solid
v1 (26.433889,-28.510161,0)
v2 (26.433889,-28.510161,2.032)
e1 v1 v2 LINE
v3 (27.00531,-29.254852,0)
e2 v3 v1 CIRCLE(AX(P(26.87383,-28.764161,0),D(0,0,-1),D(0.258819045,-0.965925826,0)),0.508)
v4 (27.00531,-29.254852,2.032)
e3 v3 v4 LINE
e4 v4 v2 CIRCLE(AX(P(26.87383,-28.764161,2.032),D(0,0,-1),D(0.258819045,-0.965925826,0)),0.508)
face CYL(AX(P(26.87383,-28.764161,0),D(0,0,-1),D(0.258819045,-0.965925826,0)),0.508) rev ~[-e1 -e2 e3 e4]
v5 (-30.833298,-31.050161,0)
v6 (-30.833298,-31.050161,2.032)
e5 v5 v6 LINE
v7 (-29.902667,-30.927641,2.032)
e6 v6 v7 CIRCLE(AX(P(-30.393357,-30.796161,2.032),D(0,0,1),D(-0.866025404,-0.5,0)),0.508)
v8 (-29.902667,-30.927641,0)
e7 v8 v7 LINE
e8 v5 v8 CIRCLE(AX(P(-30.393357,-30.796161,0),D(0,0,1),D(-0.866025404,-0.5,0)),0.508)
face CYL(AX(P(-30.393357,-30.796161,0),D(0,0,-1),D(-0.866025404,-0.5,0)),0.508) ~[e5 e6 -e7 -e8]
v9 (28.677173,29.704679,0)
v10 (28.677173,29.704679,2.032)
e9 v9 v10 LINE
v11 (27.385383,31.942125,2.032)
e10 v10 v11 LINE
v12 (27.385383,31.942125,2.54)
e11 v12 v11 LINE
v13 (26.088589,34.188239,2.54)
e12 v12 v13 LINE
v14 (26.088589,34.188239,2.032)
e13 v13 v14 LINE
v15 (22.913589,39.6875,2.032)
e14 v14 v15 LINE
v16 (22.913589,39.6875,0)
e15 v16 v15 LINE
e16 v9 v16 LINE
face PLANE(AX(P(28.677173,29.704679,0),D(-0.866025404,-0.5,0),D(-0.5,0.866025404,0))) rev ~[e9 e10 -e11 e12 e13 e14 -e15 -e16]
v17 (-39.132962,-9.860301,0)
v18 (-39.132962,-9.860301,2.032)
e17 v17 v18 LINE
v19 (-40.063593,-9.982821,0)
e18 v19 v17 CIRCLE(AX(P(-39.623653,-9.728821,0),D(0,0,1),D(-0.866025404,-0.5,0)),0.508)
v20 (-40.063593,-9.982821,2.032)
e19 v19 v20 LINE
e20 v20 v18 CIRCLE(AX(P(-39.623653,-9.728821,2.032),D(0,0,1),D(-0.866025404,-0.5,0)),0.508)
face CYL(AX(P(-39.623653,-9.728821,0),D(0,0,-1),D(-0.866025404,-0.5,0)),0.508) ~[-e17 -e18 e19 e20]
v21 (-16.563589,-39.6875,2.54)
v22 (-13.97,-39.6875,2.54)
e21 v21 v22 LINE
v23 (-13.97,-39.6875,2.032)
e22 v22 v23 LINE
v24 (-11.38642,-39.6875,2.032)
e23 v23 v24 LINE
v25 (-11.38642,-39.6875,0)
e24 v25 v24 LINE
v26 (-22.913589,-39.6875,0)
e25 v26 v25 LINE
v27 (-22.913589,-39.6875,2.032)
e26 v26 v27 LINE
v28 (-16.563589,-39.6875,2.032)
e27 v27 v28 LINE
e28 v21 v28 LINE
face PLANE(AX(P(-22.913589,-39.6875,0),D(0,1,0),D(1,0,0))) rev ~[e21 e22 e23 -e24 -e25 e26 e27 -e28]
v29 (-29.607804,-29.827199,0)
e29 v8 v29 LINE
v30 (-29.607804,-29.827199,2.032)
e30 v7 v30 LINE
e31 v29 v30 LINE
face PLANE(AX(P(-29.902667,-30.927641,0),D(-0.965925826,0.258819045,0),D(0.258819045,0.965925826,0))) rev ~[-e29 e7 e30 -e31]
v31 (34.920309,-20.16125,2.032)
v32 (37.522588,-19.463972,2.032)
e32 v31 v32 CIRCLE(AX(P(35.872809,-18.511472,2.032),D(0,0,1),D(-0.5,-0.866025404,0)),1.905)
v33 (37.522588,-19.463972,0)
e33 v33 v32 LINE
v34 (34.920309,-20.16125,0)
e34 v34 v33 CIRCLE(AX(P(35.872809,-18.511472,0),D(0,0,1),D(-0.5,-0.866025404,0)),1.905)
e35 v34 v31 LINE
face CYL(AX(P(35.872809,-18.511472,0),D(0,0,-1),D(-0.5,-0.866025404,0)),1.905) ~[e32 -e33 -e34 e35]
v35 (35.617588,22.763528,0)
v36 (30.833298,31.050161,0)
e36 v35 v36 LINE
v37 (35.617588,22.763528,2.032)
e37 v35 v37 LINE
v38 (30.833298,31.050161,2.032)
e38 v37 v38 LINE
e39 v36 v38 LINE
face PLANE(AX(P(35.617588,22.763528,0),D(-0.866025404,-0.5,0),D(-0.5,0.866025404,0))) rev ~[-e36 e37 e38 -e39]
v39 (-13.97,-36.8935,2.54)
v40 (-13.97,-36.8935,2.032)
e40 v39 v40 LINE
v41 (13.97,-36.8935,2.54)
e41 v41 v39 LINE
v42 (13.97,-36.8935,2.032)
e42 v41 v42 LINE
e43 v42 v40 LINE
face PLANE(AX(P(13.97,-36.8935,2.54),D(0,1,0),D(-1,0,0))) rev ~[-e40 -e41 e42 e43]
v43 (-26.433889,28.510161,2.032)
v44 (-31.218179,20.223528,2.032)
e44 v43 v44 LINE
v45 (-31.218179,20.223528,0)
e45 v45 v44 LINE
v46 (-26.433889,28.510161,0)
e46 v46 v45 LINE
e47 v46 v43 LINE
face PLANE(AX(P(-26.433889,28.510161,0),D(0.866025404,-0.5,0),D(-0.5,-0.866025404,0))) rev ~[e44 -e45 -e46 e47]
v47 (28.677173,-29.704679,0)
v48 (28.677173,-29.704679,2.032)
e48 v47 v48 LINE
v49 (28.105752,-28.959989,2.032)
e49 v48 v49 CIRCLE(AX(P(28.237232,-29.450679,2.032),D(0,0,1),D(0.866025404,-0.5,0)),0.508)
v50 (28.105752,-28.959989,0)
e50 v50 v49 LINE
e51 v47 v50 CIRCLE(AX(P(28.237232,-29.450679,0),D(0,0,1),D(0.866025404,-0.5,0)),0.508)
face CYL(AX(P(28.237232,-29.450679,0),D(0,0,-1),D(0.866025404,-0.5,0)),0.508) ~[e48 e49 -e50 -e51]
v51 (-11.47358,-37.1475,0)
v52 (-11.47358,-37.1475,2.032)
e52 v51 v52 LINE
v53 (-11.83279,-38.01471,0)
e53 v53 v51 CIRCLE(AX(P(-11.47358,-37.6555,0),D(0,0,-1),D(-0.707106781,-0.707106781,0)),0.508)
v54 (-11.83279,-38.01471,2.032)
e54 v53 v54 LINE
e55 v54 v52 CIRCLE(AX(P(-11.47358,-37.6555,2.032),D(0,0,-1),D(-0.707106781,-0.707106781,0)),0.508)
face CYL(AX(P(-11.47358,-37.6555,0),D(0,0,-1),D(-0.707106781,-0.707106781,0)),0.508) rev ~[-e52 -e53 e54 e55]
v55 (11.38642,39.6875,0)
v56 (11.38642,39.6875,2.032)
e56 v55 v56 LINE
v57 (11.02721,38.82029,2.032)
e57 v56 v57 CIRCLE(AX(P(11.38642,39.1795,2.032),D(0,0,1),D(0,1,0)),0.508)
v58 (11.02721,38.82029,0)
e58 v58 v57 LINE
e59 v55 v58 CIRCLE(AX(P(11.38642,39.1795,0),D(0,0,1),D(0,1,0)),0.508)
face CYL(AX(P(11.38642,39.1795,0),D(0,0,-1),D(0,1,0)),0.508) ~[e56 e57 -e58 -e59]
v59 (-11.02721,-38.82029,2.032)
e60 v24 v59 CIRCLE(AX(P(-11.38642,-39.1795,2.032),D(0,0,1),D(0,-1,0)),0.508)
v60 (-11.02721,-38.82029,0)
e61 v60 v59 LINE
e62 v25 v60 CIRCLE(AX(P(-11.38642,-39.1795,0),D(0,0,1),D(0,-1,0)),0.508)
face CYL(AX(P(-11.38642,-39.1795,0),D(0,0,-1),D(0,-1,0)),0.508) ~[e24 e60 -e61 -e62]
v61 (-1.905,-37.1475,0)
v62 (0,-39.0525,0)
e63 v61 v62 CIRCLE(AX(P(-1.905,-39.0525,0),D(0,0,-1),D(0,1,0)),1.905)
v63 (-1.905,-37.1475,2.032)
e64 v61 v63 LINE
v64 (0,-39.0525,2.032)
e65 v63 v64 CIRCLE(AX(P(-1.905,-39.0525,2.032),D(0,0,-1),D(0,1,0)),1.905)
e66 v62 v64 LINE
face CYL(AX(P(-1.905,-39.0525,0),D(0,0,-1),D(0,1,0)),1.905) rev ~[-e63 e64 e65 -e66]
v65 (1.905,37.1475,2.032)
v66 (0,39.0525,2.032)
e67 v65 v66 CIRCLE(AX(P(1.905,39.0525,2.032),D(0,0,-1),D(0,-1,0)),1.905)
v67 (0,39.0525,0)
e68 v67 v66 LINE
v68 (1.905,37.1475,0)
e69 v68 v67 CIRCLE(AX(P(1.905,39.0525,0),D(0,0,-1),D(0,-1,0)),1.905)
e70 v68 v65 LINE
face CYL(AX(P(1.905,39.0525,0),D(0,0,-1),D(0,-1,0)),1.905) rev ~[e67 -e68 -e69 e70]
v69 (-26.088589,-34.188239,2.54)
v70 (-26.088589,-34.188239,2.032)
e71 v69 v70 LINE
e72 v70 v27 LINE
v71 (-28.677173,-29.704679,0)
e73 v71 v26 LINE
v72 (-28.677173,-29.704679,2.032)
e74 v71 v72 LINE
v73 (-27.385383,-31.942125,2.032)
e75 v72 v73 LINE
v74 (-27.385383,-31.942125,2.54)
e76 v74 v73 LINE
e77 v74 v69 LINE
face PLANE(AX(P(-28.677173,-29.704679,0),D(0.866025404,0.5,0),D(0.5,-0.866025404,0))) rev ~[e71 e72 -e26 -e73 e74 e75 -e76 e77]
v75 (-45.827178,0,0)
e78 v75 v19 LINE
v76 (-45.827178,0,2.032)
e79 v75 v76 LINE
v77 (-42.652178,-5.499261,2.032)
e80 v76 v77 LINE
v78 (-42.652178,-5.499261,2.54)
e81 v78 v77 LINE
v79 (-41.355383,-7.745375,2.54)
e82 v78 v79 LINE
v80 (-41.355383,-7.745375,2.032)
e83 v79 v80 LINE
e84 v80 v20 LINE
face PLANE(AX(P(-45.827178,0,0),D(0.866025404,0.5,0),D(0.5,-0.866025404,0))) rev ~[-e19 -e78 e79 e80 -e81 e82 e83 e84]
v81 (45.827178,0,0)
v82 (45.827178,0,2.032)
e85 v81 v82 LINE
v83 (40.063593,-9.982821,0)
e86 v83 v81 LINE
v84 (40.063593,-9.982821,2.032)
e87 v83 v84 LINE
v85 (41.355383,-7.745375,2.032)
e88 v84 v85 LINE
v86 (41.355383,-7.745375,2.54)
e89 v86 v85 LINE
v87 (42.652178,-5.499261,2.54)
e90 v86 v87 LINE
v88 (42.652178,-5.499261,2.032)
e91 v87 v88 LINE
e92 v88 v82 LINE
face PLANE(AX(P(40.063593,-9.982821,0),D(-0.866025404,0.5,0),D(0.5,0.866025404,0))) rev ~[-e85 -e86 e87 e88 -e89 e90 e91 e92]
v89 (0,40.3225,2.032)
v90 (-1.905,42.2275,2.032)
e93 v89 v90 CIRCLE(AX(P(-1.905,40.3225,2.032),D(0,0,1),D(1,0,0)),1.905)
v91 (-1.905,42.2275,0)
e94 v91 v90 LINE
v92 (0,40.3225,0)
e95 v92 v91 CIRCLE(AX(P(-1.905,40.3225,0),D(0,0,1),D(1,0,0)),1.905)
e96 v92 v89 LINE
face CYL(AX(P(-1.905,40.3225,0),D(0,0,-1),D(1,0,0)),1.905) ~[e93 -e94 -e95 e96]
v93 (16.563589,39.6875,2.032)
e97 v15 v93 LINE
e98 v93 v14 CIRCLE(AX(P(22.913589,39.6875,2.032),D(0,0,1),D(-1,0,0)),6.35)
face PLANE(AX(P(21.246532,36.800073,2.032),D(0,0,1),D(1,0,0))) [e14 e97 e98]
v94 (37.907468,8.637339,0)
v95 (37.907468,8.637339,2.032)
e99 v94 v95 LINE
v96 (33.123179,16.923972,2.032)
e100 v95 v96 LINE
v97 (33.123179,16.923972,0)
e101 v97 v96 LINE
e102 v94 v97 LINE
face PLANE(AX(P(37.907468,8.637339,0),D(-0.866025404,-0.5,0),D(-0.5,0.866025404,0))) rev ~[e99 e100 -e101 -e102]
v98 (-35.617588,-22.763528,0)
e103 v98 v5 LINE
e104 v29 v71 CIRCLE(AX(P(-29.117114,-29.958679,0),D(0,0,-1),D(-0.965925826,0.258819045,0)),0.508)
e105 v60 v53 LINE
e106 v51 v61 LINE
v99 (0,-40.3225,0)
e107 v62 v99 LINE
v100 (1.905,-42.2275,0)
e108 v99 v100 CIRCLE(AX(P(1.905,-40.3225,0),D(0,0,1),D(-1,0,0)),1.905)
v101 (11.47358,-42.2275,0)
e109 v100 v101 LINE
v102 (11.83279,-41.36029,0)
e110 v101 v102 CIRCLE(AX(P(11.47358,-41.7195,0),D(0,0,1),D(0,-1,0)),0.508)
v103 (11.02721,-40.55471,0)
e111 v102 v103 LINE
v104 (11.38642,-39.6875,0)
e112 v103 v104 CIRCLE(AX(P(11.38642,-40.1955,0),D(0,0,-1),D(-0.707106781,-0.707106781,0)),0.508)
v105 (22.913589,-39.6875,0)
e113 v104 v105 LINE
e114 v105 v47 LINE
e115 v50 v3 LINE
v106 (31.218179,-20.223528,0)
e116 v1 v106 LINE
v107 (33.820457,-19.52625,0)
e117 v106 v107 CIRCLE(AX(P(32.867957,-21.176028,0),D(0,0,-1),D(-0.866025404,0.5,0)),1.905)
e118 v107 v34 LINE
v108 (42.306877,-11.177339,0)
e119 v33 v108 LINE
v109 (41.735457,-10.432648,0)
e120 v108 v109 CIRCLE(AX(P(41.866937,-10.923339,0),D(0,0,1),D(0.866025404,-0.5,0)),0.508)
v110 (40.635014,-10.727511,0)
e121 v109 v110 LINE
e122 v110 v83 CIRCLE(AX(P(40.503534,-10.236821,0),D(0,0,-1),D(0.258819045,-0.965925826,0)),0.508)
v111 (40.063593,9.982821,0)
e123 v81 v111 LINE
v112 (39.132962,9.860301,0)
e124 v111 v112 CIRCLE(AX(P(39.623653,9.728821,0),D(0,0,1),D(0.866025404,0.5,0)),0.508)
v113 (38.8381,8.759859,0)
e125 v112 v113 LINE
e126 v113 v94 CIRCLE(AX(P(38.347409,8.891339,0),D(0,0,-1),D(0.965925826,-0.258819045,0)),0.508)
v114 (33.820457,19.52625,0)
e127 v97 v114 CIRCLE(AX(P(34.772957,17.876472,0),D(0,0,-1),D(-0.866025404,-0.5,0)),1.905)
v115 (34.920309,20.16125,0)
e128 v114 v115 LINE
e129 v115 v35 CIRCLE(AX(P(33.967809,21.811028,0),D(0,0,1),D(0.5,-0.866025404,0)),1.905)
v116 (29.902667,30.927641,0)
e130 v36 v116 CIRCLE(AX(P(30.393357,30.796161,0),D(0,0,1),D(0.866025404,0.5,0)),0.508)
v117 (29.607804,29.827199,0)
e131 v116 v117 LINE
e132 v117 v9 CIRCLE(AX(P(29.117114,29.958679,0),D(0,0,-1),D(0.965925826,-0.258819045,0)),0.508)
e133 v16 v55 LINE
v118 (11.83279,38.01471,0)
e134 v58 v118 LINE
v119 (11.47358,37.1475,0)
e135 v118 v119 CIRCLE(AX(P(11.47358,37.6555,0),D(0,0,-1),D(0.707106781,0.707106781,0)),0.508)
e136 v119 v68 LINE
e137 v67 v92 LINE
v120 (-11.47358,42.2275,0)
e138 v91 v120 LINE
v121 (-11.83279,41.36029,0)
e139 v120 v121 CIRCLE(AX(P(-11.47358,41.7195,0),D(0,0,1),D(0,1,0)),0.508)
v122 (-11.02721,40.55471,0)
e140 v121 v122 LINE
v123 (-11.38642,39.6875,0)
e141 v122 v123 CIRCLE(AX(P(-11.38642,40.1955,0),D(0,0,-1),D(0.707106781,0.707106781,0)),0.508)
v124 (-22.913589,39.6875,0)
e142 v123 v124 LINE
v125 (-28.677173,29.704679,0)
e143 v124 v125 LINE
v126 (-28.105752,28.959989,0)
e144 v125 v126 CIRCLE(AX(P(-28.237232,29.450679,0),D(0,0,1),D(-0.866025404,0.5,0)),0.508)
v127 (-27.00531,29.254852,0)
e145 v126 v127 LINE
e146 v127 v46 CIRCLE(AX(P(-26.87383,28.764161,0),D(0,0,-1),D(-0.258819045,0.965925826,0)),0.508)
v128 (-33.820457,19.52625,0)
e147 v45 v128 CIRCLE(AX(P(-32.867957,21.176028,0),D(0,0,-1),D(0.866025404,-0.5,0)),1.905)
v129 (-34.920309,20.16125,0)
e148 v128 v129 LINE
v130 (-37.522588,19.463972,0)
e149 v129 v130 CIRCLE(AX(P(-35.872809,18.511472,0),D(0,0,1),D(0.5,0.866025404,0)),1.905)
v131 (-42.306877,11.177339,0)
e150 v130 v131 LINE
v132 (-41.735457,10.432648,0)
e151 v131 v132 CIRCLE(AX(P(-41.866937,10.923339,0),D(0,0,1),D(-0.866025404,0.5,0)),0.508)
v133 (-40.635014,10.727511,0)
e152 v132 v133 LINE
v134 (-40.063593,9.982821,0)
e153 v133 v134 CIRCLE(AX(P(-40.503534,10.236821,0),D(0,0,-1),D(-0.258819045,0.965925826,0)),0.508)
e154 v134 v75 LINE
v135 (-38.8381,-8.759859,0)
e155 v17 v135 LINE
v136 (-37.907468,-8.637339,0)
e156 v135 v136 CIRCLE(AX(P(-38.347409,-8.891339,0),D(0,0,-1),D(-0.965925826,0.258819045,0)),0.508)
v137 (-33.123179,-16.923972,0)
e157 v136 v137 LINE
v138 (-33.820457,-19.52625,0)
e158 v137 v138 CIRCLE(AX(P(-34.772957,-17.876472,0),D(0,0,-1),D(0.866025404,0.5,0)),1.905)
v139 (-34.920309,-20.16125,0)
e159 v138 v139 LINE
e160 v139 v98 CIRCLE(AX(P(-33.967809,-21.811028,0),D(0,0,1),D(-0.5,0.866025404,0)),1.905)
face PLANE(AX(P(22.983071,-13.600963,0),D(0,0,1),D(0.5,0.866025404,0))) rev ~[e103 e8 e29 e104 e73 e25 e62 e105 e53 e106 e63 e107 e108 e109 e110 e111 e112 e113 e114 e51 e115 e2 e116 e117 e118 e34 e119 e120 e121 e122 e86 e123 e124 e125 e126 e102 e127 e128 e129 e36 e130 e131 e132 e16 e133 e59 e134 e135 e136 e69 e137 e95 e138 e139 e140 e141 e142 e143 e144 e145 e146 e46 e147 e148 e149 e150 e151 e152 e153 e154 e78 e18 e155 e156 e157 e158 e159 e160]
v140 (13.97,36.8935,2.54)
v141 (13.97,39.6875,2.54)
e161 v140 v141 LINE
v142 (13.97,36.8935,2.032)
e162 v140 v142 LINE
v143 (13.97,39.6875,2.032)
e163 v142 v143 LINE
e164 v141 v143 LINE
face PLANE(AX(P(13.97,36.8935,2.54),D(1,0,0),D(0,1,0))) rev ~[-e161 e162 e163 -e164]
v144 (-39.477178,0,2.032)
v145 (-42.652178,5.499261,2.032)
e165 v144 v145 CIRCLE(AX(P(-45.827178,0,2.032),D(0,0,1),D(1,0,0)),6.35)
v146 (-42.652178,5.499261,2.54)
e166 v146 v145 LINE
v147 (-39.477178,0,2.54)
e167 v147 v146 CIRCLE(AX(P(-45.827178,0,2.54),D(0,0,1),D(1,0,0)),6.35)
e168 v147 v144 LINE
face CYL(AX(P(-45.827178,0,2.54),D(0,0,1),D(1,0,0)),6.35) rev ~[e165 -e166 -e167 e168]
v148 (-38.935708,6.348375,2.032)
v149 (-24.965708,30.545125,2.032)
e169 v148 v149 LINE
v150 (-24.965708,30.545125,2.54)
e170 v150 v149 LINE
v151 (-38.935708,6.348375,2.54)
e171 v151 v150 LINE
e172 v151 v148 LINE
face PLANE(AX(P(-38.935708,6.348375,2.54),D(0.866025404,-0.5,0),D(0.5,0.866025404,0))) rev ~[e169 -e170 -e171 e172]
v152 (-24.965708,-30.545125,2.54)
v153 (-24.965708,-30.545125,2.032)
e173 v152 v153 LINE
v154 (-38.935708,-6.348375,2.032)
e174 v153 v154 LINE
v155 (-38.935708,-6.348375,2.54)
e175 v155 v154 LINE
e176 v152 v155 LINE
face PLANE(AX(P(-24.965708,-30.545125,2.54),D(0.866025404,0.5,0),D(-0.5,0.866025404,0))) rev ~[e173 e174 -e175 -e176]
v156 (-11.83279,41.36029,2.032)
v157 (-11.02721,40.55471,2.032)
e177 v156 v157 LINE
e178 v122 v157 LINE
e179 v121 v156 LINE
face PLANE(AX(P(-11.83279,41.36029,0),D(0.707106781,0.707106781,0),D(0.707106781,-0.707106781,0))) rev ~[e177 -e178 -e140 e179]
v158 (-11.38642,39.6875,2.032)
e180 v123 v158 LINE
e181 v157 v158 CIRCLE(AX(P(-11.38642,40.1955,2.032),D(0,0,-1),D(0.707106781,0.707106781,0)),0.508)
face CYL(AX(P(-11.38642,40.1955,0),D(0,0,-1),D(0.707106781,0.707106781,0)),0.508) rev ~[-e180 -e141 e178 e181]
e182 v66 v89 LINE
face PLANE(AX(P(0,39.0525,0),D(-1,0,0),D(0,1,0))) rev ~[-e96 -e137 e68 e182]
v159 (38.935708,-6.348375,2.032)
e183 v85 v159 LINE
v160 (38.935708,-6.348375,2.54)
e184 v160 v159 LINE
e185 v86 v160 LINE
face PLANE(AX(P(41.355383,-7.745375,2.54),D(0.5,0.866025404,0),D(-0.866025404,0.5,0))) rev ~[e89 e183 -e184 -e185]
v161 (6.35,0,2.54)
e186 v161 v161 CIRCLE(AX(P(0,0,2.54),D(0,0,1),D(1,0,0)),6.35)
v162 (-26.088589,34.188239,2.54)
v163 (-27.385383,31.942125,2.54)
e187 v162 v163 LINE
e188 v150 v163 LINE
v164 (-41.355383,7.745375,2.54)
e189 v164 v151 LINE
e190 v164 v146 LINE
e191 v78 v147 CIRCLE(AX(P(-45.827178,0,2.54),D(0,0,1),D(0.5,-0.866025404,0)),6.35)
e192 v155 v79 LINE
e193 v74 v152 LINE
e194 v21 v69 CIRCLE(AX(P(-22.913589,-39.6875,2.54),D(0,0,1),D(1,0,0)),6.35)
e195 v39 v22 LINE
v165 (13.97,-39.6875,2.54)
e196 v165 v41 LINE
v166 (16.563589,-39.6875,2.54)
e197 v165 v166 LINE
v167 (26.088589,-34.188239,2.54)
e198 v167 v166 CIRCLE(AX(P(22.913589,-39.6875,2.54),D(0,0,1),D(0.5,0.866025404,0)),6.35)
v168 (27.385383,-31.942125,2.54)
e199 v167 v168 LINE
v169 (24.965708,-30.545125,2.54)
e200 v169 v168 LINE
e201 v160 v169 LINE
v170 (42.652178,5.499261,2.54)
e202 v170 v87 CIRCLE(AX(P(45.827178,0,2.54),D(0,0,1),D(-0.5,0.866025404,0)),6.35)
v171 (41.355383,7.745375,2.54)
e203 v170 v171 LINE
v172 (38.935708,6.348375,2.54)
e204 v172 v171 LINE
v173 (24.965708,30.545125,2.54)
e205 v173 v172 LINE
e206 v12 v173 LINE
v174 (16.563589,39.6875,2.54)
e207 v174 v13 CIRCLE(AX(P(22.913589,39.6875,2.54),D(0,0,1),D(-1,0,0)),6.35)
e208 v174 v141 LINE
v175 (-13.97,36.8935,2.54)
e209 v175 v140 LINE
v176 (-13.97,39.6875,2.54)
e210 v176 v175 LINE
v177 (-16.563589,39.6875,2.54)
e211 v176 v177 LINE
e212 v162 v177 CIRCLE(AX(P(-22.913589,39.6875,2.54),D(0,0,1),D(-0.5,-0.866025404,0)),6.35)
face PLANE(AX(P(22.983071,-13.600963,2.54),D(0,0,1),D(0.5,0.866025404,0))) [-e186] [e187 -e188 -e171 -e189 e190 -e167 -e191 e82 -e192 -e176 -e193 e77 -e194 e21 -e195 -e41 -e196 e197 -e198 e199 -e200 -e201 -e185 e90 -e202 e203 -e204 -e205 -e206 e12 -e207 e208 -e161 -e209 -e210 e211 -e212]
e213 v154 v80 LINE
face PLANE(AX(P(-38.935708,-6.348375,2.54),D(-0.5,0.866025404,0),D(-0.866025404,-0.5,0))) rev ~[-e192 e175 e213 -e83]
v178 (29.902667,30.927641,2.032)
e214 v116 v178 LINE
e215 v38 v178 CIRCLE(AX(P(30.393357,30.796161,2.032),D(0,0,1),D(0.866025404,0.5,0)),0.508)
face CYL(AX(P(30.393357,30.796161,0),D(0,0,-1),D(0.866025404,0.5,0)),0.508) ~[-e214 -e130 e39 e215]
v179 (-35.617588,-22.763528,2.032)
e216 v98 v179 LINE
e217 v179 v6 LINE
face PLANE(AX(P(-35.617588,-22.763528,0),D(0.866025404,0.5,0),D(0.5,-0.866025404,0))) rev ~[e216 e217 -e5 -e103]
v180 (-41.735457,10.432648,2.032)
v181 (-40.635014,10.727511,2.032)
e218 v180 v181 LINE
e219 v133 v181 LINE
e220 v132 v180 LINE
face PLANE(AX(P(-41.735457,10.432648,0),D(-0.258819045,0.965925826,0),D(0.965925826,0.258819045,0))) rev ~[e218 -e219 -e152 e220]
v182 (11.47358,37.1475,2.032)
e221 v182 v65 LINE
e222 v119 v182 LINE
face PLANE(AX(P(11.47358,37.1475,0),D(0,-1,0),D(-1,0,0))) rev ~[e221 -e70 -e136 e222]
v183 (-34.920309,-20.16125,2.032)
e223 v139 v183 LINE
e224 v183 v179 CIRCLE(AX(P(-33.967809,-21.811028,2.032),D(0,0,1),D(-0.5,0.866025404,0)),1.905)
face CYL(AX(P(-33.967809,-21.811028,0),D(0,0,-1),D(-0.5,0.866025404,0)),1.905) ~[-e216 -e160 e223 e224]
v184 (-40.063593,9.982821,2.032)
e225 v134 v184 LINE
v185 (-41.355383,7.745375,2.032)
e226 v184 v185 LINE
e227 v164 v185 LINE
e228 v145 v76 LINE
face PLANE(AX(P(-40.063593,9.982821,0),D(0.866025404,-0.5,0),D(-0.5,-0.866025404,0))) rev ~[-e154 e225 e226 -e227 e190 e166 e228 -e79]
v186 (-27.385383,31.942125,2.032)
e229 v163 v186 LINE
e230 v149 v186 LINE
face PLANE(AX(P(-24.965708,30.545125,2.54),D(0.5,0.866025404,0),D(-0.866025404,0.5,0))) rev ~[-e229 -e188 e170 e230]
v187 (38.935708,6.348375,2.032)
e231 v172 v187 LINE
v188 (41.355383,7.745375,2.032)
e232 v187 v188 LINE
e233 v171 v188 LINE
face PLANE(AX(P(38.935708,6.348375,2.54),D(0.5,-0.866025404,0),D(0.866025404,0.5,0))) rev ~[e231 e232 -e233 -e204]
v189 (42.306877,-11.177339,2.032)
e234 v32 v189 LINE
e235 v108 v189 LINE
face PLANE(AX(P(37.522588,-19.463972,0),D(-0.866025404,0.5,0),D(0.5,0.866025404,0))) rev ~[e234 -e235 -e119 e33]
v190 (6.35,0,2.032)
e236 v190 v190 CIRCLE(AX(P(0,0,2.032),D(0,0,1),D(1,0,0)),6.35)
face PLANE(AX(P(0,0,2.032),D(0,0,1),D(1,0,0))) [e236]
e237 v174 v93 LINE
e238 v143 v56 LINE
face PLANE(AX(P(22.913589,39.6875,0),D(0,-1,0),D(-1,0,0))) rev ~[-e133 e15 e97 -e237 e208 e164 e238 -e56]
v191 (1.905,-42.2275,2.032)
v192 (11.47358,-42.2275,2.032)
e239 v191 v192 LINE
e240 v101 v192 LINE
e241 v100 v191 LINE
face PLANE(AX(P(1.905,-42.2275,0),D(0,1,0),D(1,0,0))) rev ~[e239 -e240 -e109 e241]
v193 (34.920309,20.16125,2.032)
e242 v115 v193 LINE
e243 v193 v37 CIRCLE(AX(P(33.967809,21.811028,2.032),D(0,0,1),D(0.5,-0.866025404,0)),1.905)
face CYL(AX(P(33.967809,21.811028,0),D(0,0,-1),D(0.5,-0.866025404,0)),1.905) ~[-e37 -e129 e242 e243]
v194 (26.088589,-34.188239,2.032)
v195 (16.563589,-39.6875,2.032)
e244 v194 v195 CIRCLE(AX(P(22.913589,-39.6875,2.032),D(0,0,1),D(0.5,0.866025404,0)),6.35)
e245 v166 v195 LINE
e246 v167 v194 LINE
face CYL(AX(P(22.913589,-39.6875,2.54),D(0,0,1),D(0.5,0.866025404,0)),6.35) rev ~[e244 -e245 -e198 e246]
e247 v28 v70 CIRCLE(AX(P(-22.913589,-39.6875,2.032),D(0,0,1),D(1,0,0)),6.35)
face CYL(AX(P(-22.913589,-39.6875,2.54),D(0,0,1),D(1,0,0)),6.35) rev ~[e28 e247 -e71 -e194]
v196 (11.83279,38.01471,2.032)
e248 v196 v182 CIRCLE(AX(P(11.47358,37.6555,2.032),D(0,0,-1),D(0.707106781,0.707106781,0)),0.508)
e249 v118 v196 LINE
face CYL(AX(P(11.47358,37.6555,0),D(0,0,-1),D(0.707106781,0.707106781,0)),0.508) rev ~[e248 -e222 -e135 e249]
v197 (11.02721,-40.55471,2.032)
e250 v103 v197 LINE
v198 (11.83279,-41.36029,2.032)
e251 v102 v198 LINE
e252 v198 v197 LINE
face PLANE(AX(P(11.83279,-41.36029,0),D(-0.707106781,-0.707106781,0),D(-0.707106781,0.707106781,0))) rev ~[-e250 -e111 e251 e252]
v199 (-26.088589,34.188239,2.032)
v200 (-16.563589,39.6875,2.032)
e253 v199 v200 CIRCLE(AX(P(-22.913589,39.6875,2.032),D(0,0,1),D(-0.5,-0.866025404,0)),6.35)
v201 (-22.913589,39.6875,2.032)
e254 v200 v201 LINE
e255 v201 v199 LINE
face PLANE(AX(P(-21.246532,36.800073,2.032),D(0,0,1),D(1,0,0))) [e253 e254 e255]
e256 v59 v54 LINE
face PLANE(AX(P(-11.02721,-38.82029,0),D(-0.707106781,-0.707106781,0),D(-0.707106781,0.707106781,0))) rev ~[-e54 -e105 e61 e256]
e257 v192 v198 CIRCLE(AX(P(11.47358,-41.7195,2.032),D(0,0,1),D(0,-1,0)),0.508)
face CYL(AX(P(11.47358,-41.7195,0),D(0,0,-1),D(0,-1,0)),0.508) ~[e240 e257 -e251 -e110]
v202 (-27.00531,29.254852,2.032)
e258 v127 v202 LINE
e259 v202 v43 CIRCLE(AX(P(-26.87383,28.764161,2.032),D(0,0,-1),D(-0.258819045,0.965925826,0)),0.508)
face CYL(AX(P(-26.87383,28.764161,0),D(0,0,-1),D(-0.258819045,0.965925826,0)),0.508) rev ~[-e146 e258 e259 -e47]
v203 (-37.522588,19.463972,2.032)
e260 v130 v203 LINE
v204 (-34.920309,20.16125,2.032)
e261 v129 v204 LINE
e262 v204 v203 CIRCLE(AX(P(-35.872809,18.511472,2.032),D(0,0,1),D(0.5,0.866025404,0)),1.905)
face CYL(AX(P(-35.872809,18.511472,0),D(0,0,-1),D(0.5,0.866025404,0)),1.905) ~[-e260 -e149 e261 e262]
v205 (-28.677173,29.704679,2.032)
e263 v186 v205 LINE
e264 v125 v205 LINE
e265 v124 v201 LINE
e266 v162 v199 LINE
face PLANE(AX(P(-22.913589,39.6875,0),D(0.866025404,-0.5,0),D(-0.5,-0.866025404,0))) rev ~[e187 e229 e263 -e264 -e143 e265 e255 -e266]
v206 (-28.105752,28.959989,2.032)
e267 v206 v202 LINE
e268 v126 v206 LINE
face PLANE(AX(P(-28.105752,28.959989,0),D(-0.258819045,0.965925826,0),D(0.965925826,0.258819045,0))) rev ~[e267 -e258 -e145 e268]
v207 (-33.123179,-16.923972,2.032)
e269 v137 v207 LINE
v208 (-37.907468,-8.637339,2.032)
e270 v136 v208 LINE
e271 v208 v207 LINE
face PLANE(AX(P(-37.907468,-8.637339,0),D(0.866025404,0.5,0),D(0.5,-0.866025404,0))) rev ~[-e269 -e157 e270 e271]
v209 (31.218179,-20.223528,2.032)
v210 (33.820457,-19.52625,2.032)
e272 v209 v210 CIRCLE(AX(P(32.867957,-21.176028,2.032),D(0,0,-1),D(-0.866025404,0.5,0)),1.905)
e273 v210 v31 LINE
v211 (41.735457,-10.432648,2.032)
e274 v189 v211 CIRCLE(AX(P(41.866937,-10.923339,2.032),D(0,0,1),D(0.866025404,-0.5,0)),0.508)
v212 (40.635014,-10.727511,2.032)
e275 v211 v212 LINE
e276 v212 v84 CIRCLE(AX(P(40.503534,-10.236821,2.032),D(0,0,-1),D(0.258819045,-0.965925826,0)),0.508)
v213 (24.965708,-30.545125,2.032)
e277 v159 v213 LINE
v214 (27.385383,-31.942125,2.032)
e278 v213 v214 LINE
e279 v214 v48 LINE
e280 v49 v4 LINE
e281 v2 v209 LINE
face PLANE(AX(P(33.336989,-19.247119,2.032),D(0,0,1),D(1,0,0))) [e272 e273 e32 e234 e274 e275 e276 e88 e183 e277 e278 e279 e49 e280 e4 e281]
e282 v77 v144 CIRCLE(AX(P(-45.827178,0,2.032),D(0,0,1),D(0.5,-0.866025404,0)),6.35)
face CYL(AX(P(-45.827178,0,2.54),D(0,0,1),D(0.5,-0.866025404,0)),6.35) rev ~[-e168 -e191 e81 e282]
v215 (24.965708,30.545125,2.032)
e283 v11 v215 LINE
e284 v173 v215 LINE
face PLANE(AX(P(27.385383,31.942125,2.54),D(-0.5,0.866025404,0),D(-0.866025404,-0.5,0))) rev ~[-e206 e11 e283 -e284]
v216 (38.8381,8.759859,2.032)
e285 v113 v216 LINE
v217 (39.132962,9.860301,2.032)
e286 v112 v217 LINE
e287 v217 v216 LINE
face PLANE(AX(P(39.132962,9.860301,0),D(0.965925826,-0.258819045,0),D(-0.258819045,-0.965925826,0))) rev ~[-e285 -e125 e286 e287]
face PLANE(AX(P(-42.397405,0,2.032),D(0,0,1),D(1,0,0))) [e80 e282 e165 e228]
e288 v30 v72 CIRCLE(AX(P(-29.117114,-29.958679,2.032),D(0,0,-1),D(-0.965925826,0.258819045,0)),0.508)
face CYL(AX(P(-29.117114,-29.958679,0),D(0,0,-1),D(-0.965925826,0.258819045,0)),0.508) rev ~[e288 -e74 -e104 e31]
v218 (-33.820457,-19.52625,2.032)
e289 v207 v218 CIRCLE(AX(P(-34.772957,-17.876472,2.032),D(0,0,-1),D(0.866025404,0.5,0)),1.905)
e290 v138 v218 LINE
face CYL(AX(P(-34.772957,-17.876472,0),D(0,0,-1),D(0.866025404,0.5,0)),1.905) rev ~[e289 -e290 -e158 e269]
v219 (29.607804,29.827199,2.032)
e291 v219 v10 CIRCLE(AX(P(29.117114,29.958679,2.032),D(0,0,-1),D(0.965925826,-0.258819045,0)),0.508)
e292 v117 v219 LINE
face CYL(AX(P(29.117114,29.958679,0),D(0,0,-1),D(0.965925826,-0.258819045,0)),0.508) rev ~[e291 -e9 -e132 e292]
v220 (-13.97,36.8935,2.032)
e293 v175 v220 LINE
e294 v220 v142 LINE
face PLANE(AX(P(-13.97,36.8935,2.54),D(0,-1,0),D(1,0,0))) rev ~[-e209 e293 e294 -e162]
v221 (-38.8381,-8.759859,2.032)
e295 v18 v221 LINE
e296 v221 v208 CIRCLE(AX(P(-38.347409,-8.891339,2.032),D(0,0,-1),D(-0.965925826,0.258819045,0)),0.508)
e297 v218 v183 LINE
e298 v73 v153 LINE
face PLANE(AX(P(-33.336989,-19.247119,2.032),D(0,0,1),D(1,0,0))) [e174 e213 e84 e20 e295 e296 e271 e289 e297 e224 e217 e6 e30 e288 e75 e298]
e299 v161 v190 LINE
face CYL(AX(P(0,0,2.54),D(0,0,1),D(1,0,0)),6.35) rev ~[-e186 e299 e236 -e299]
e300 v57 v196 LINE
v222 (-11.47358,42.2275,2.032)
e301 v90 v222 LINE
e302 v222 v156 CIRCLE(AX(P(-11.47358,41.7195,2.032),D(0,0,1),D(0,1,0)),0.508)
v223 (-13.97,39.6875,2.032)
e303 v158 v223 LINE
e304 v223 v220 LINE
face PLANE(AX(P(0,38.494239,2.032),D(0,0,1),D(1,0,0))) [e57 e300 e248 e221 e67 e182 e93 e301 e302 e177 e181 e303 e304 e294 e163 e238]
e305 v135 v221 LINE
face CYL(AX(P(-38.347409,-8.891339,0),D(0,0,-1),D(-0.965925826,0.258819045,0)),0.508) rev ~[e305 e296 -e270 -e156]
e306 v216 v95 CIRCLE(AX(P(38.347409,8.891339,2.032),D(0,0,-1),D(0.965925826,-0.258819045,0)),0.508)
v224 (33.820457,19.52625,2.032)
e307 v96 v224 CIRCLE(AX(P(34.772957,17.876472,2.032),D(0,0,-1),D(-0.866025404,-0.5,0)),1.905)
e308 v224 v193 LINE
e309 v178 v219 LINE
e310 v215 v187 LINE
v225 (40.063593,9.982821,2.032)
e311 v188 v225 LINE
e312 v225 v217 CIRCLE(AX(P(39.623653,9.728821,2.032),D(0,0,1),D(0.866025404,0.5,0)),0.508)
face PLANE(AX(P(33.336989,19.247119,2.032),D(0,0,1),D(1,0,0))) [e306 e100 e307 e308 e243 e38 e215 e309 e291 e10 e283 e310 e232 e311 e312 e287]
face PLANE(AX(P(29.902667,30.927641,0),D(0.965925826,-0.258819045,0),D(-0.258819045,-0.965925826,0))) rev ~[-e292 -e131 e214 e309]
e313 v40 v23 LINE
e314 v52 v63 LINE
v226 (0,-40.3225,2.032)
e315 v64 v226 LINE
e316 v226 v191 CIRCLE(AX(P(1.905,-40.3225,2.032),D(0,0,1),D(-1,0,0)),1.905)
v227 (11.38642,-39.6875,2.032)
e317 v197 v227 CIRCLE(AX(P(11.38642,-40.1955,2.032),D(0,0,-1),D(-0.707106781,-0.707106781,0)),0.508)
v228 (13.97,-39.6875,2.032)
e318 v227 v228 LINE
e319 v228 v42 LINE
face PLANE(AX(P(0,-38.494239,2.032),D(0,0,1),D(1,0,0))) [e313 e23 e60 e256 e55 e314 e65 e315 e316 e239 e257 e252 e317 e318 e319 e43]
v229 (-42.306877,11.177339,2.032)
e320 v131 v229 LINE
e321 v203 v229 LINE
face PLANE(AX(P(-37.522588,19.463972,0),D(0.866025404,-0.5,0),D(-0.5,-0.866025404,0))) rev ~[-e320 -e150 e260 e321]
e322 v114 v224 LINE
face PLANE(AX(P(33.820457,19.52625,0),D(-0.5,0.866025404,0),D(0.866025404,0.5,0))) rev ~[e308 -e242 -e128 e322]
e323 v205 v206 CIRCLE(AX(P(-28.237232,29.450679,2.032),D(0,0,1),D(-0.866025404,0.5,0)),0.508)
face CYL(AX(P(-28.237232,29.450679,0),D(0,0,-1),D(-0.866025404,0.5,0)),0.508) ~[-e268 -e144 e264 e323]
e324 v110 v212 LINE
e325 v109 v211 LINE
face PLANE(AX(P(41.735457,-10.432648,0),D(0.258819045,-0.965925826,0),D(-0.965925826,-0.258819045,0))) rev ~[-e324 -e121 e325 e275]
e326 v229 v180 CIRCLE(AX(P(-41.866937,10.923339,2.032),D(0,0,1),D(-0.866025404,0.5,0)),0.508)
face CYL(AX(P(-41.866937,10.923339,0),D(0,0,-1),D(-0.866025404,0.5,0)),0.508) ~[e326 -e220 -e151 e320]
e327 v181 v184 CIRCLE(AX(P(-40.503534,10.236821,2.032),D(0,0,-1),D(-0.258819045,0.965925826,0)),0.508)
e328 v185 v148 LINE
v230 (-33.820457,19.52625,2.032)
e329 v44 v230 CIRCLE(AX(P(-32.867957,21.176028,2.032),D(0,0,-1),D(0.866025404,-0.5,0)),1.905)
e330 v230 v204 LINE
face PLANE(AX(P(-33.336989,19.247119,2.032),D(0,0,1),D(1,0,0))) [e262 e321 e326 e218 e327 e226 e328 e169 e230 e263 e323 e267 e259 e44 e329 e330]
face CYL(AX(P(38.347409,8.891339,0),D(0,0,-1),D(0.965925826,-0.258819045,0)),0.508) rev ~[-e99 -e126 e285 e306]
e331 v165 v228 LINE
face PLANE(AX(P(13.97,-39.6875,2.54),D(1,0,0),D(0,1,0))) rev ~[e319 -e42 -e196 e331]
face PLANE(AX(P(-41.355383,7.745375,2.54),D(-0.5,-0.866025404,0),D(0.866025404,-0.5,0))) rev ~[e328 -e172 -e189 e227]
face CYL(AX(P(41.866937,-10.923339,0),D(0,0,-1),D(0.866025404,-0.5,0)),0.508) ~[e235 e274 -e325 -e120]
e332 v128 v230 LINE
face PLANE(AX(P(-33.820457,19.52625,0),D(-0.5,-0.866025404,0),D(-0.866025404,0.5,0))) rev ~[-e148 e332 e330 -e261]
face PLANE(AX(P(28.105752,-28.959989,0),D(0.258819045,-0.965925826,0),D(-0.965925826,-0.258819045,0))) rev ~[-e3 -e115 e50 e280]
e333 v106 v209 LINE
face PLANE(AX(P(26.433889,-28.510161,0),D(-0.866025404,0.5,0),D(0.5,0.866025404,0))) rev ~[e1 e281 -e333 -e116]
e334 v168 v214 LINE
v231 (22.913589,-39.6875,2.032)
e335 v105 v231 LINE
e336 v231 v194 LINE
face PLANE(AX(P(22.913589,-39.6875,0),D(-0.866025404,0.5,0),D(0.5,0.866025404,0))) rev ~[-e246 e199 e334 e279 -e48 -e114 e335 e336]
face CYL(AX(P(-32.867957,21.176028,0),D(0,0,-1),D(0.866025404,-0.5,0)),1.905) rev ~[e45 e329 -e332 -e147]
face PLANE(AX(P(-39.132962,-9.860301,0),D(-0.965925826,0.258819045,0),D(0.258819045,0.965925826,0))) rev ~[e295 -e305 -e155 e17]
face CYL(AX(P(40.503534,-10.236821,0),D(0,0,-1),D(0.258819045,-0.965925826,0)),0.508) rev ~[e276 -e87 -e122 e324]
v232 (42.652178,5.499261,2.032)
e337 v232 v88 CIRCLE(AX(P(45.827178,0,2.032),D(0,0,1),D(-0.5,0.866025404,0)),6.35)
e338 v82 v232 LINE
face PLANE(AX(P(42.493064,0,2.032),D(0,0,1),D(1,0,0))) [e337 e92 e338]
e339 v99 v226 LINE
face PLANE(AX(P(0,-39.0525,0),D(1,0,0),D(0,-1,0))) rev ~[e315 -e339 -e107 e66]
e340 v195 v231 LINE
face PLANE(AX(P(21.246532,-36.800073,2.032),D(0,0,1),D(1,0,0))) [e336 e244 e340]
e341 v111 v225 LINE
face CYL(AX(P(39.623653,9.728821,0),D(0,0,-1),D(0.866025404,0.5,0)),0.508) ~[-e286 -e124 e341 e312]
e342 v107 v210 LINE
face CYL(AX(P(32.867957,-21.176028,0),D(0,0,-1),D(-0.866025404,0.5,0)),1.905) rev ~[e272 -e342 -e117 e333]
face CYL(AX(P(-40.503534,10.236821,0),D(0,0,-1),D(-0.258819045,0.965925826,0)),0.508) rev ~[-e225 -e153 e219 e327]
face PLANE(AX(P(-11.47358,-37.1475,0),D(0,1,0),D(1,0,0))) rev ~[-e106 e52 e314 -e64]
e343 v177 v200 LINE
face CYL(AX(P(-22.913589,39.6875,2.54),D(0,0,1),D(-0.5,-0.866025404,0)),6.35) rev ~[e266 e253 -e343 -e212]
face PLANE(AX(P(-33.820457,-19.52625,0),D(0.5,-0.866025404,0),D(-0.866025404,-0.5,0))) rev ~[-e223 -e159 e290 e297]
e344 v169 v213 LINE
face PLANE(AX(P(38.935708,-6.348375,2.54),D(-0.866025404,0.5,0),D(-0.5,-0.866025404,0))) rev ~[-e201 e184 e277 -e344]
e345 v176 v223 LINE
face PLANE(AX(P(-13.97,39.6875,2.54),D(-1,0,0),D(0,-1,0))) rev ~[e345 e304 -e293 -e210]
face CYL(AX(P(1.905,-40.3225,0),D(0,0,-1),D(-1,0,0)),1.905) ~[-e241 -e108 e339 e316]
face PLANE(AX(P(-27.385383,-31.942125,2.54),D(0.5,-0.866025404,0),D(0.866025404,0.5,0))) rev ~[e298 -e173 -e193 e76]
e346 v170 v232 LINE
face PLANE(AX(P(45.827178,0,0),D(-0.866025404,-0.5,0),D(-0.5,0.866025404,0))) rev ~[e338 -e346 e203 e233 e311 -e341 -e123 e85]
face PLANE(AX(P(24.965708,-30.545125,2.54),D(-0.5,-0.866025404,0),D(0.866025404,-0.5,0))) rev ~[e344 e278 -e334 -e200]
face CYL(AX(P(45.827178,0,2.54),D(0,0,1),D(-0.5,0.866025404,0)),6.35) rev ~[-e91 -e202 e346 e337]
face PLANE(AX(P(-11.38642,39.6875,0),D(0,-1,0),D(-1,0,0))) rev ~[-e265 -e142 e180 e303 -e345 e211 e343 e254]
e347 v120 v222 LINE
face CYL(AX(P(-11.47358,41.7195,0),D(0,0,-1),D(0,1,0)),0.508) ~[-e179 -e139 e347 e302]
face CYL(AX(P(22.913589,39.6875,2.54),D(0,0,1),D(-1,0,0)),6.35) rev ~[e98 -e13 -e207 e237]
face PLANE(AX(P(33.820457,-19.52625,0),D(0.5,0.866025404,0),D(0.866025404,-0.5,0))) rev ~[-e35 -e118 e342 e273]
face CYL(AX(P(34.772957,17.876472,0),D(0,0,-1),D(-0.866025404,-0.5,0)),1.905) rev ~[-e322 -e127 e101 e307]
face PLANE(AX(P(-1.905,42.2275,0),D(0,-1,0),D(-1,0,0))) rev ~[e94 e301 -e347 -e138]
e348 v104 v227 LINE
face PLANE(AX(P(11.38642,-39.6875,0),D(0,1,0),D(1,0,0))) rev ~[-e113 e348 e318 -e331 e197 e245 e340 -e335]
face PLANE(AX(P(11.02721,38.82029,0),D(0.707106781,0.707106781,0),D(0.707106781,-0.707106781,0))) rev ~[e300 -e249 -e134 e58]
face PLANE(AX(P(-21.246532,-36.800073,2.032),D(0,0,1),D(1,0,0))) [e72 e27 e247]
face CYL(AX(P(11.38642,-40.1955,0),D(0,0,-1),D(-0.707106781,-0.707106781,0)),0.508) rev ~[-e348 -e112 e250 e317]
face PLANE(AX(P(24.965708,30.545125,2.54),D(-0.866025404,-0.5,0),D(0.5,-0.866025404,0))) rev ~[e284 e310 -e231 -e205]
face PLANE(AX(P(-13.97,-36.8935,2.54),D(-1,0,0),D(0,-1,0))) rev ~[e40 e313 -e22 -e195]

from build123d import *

# Parameters (mm, degrees)
F1_DEPTH = 2.54
F2_COUNT = 6
F4_R     = 6.35
F5_DEPTH = 0.508


# Not quite as in the source:
# - a feature names something its author has since deleted; it is built from what else it names


with BuildPart() as f1:
    # F0 (on Top) → F1 (new body)
    with BuildSketch(Plane.XY):
        with BuildLine():
            Line((11.3864204897, -39.6875), (22.9135888085, -39.6875))
            Line((22.9135888085, -39.6875), (0, 0))
            Line((0, 0), (-22.9135888085, -39.6875))
            Line((-22.9135888085, -39.6875), (-11.3864204897, -39.6875))
            ThreePointArc((-11.3864204897, -39.6875), (-10.9170896872, -39.3739031836), (-11.0272102448, -38.8202897552))
            Line((-11.0272102448, -38.8202897552), (-11.8327897552, -38.0147102448))
            ThreePointArc((-11.8327897552, -38.0147102448), (-11.9429103128, -37.4610968164), (-11.4735795103, -37.1475))
            Line((-11.4735795103, -37.1475), (-1.905, -37.1475))
            ThreePointArc((-1.905, -37.1475), (-0.5579615818, -37.7054615818), (0, -39.0525))
            Line((0, -39.0525), (0, -39.6875))
            Line((0, -39.6875), (11.3864204897, -39.6875))
        make_face()
        with BuildLine():
            ThreePointArc((11.0272102448, -40.5547102448), (10.9170896872, -40.0010968164), (11.3864204897, -39.6875))
            Line((11.3864204897, -39.6875), (0, -39.6875))
            Line((0, -39.6875), (0, -40.3225))
            ThreePointArc((0, -40.3225), (0.5579615818, -41.6695384182), (1.905, -42.2275))
            Line((1.905, -42.2275), (11.4735795103, -42.2275))
            ThreePointArc((11.4735795103, -42.2275), (11.9429103128, -41.9139031836), (11.8327897552, -41.3602897552))
            Line((11.8327897552, -41.3602897552), (11.0272102448, -40.5547102448))
        make_face()
    extrude(amount=F1_DEPTH)


with BuildPart() as f2_1:
    # F2: instance of F1
    add(f1.part.rotate(Axis((0, 0, 1.27), (0, 0, -1)), 1 * 360 / F2_COUNT))


with BuildPart() as f2_2:
    # F2: instance of F1
    add(f1.part.rotate(Axis((0, 0, 1.27), (0, 0, -1)), 2 * 360 / F2_COUNT))


with BuildPart() as f2_3:
    # F2: instance of F1
    add(f1.part.rotate(Axis((0, 0, 1.27), (0, 0, -1)), 3 * 360 / F2_COUNT))


with BuildPart() as f2_4:
    # F2: instance of F1
    add(f1.part.rotate(Axis((0, 0, 1.27), (0, 0, -1)), 4 * 360 / F2_COUNT))


with BuildPart() as f2_5:
    # F2: instance of F1
    add(f1.part.rotate(Axis((0, 0, 1.27), (0, 0, -1)), 5 * 360 / F2_COUNT))


with BuildPart() as f1_1:
    add(f1.part)

    # F3: union F2_1, F2_2, F2_3, F2_4, F2_5
    add(f2_1.part)
    add(f2_2.part)
    add(f2_3.part)
    add(f2_4.part)
    add(f2_5.part)

    # F4 (on face) → F5 (cut)
    with BuildSketch(Plane.XY.offset(2.54)):
        with BuildLine():
            Line((13.97, -36.8935), (-13.97, -36.8935))
            Line((-13.97, -36.8935), (-13.97, -39.6875))
            Line((-13.97, -39.6875), (-11.3864204897, -39.6875))
            ThreePointArc((-11.3864204897, -39.6875), (-10.9170896872, -39.3739031836), (-11.0272102448, -38.8202897552))
            Line((-11.0272102448, -38.8202897552), (-11.8327897552, -38.0147102448))
            ThreePointArc((-11.8327897552, -38.0147102448), (-11.9429103128, -37.4610968164), (-11.4735795103, -37.1475))
            Line((-11.4735795103, -37.1475), (-1.905, -37.1475))
            ThreePointArc((-1.905, -37.1475), (-0.5579615818, -37.7054615818), (0, -39.0525))
            Line((0, -39.0525), (0, -40.3225))
            ThreePointArc((0, -40.3225), (0.5579615818, -41.6695384182), (1.905, -42.2275))
            Line((1.905, -42.2275), (11.4735795103, -42.2275))
            ThreePointArc((11.4735795103, -42.2275), (11.9429103128, -41.9139031836), (11.8327897552, -41.3602897552))
            Line((11.8327897552, -41.3602897552), (11.0272102448, -40.5547102448))
            ThreePointArc((11.0272102448, -40.5547102448), (10.9170896872, -40.0010968164), (11.3864204897, -39.6875))
            Line((11.3864204897, -39.6875), (13.97, -39.6875))
            Line((13.97, -39.6875), (13.97, -36.8935))
        make_face()
        with BuildLine():
            Line((-22.9135888085, -39.6875), (-16.5635888085, -39.6875))
            ThreePointArc((-16.5635888085, -39.6875), (-19.7385888085, -34.188238686), (-26.0885888085, -34.188238686))
            Line((-26.0885888085, -34.188238686), (-22.9135888085, -39.6875))
        make_face()
        with BuildLine():
            ThreePointArc((26.0885888085, -34.188238686), (19.7385888085, -34.188238686), (16.5635888085, -39.6875))
            Line((16.5635888085, -39.6875), (22.9135888085, -39.6875))
            Line((22.9135888085, -39.6875), (26.0885888085, -34.188238686))
        make_face()
        with BuildLine():
            Line((-28.6771729679, -29.7046794022), (-27.3853832127, -31.9421248909))
            Line((-27.3853832127, -31.9421248909), (-24.9657082345, -30.5451248909))
            Line((-24.9657082345, -30.5451248909), (-38.9357082345, -6.3483751091))
            Line((-38.9357082345, -6.3483751091), (-41.3553832127, -7.7453751091))
            Line((-41.3553832127, -7.7453751091), (-40.0635934575, -9.9828205978))
            ThreePointArc((-40.0635934575, -9.9828205978), (-39.5573452468, -10.2324745873), (-39.1329622327, -9.8603006727))
            Line((-39.1329622327, -9.8603006727), (-38.8380996671, -8.7598585968))
            ThreePointArc((-38.8380996671, -8.7598585968), (-38.413716653, -8.3876846821), (-37.9074684422, -8.6373386717))
            Line((-37.9074684422, -8.6373386717), (-33.1231786871, -16.9239716058))
            ThreePointArc((-33.1231786871, -16.9239716058), (-32.9328683822, -18.3695218867), (-33.8204570813, -19.52625))
            Line((-33.8204570813, -19.52625), (-34.9203093441, -20.16125))
            ThreePointArc((-34.9203093441, -20.16125), (-35.8078980432, -21.3179781133), (-35.6175877383, -22.7635283942))
            Line((-35.6175877383, -22.7635283942), (-30.8332979832, -31.0501613283))
            ThreePointArc((-30.8332979832, -31.0501613283), (-30.3270497724, -31.2998153179), (-29.9026667583, -30.9276414032))
            Line((-29.9026667583, -30.9276414032), (-29.6078041927, -29.8271993273))
            ThreePointArc((-29.6078041927, -29.8271993273), (-29.1834211786, -29.4550254127), (-28.6771729679, -29.7046794022))
        make_face()
        with BuildLine():
            Line((24.9657082345, -30.5451248909), (27.3853832127, -31.9421248909))
            Line((27.3853832127, -31.9421248909), (28.6771729679, -29.7046794022))
            ThreePointArc((28.6771729679, -29.7046794022), (28.6402555596, -29.1414285963), (28.1057519878, -28.9599890825))
            Line((28.1057519878, -28.9599890825), (27.005309912, -29.254851648))
            ThreePointArc((27.005309912, -29.254851648), (26.4708063402, -29.0734121342), (26.4338889319, -28.5101613283))
            Line((26.4338889319, -28.5101613283), (31.2181786871, -20.2235283942))
            ThreePointArc((31.2181786871, -20.2235283942), (32.3749068004, -19.3359396951), (33.8204570813, -19.52625))
            Line((33.8204570813, -19.52625), (34.9203093441, -20.16125))
            ThreePointArc((34.9203093441, -20.16125), (36.365859625, -20.3515603049), (37.5225877383, -19.4639716058))
            Line((37.5225877383, -19.4639716058), (42.3068774935, -11.1773386717))
            ThreePointArc((42.3068774935, -11.1773386717), (42.2699600852, -10.6140878658), (41.7354565134, -10.432648352))
            Line((41.7354565134, -10.432648352), (40.6350144376, -10.7275109175))
            ThreePointArc((40.6350144376, -10.7275109175), (40.1005108658, -10.5460714037), (40.0635934575, -9.9828205978))
            Line((40.0635934575, -9.9828205978), (41.3553832127, -7.7453751091))
            Line((41.3553832127, -7.7453751091), (38.9357082345, -6.3483751091))
            Line((38.9357082345, -6.3483751091), (24.9657082345, -30.5451248909))
        make_face()
        with BuildLine():
            Line((-45.8271776169, 0), (-42.6521776169, -5.499261314))
            ThreePointArc((-42.6521776169, -5.499261314), (-40.3279163029, -3.175), (-39.4771776169, 0))
            ThreePointArc((-39.4771776169, 0), (-40.3279163029, 3.175), (-42.6521776169, 5.499261314))
            Line((-42.6521776169, 5.499261314), (-45.8271776169, 0))
        make_face()
        with BuildLine():
            ThreePointArc((42.6521776169, 5.499261314), (39.4771776169, 0), (42.6521776169, -5.499261314))
            Line((42.6521776169, -5.499261314), (45.8271776169, 0))
            Line((45.8271776169, 0), (42.6521776169, 5.499261314))
        make_face()
        with BuildLine():
            Line((-40.0635934575, 9.9828205978), (-41.3553832127, 7.7453751091))
            Line((-41.3553832127, 7.7453751091), (-38.9357082345, 6.3483751091))
            Line((-38.9357082345, 6.3483751091), (-24.9657082345, 30.5451248909))
            Line((-24.9657082345, 30.5451248909), (-27.3853832127, 31.9421248909))
            Line((-27.3853832127, 31.9421248909), (-28.6771729679, 29.7046794022))
            ThreePointArc((-28.6771729679, 29.7046794022), (-28.6402555596, 29.1414285963), (-28.1057519878, 28.9599890825))
            Line((-28.1057519878, 28.9599890825), (-27.005309912, 29.254851648))
            ThreePointArc((-27.005309912, 29.254851648), (-26.4708063402, 29.0734121342), (-26.4338889319, 28.5101613283))
            Line((-26.4338889319, 28.5101613283), (-31.2181786871, 20.2235283942))
            ThreePointArc((-31.2181786871, 20.2235283942), (-32.3749068004, 19.3359396951), (-33.8204570813, 19.52625))
            Line((-33.8204570813, 19.52625), (-34.9203093441, 20.16125))
            ThreePointArc((-34.9203093441, 20.16125), (-36.365859625, 20.3515603049), (-37.5225877383, 19.4639716058))
            Line((-37.5225877383, 19.4639716058), (-42.3068774935, 11.1773386717))
            ThreePointArc((-42.3068774935, 11.1773386717), (-42.2699600852, 10.6140878658), (-41.7354565134, 10.432648352))
            Line((-41.7354565134, 10.432648352), (-40.6350144376, 10.7275109175))
            ThreePointArc((-40.6350144376, 10.7275109175), (-40.1005108658, 10.5460714037), (-40.0635934575, 9.9828205978))
        make_face()
        with BuildLine():
            Line((38.9357082345, 6.3483751091), (41.3553832127, 7.7453751091))
            Line((41.3553832127, 7.7453751091), (40.0635934575, 9.9828205978))
            ThreePointArc((40.0635934575, 9.9828205978), (39.5573452468, 10.2324745873), (39.1329622327, 9.8603006727))
            Line((39.1329622327, 9.8603006727), (38.8380996671, 8.7598585968))
            ThreePointArc((38.8380996671, 8.7598585968), (38.413716653, 8.3876846821), (37.9074684422, 8.6373386717))
            Line((37.9074684422, 8.6373386717), (33.1231786871, 16.9239716058))
            ThreePointArc((33.1231786871, 16.9239716058), (32.9328683822, 18.3695218867), (33.8204570813, 19.52625))
            Line((33.8204570813, 19.52625), (34.9203093441, 20.16125))
            ThreePointArc((34.9203093441, 20.16125), (35.8078980432, 21.3179781133), (35.6175877383, 22.7635283942))
            Line((35.6175877383, 22.7635283942), (30.8332979832, 31.0501613283))
            ThreePointArc((30.8332979832, 31.0501613283), (30.3270497724, 31.2998153179), (29.9026667583, 30.9276414032))
            Line((29.9026667583, 30.9276414032), (29.6078041927, 29.8271993273))
            ThreePointArc((29.6078041927, 29.8271993273), (29.1834211786, 29.4550254127), (28.6771729679, 29.7046794022))
            Line((28.6771729679, 29.7046794022), (27.3853832127, 31.9421248909))
            Line((27.3853832127, 31.9421248909), (24.9657082345, 30.5451248909))
            Line((24.9657082345, 30.5451248909), (38.9357082345, 6.3483751091))
        make_face()
        with BuildLine():
            Line((-22.9135888085, 39.6875), (-26.0885888085, 34.188238686))
            ThreePointArc((-26.0885888085, 34.188238686), (-19.7385888085, 34.188238686), (-16.5635888085, 39.6875))
            Line((-16.5635888085, 39.6875), (-22.9135888085, 39.6875))
        make_face()
        with BuildLine():
            ThreePointArc((16.5635888085, 39.6875), (19.7385888085, 34.188238686), (26.0885888085, 34.188238686))
            Line((26.0885888085, 34.188238686), (22.9135888085, 39.6875))
            Line((22.9135888085, 39.6875), (16.5635888085, 39.6875))
        make_face()
        with BuildLine():
            Line((-11.3864204897, 39.6875), (-13.97, 39.6875))
            Line((-13.97, 39.6875), (-13.97, 36.8935))
            Line((-13.97, 36.8935), (13.97, 36.8935))
            Line((13.97, 36.8935), (13.97, 39.6875))
            Line((13.97, 39.6875), (11.3864204897, 39.6875))
            ThreePointArc((11.3864204897, 39.6875), (10.9170896872, 39.3739031836), (11.0272102448, 38.8202897552))
            Line((11.0272102448, 38.8202897552), (11.8327897552, 38.0147102448))
            ThreePointArc((11.8327897552, 38.0147102448), (11.9429103128, 37.4610968164), (11.4735795103, 37.1475))
            Line((11.4735795103, 37.1475), (1.905, 37.1475))
            ThreePointArc((1.905, 37.1475), (0.5579615818, 37.7054615818), (0, 39.0525))
            Line((0, 39.0525), (0, 40.3225))
            ThreePointArc((0, 40.3225), (-0.5579615818, 41.6695384182), (-1.905, 42.2275))
            Line((-1.905, 42.2275), (-11.4735795103, 42.2275))
            ThreePointArc((-11.4735795103, 42.2275), (-11.9429103128, 41.9139031836), (-11.8327897552, 41.3602897552))
            Line((-11.8327897552, 41.3602897552), (-11.0272102448, 40.5547102448))
            ThreePointArc((-11.0272102448, 40.5547102448), (-10.9170896872, 40.0010968164), (-11.3864204897, 39.6875))
        make_face()
        Circle(F4_R)
    extrude(amount=-F5_DEPTH, mode=Mode.SUBTRACT)


solid = f1_1.part
